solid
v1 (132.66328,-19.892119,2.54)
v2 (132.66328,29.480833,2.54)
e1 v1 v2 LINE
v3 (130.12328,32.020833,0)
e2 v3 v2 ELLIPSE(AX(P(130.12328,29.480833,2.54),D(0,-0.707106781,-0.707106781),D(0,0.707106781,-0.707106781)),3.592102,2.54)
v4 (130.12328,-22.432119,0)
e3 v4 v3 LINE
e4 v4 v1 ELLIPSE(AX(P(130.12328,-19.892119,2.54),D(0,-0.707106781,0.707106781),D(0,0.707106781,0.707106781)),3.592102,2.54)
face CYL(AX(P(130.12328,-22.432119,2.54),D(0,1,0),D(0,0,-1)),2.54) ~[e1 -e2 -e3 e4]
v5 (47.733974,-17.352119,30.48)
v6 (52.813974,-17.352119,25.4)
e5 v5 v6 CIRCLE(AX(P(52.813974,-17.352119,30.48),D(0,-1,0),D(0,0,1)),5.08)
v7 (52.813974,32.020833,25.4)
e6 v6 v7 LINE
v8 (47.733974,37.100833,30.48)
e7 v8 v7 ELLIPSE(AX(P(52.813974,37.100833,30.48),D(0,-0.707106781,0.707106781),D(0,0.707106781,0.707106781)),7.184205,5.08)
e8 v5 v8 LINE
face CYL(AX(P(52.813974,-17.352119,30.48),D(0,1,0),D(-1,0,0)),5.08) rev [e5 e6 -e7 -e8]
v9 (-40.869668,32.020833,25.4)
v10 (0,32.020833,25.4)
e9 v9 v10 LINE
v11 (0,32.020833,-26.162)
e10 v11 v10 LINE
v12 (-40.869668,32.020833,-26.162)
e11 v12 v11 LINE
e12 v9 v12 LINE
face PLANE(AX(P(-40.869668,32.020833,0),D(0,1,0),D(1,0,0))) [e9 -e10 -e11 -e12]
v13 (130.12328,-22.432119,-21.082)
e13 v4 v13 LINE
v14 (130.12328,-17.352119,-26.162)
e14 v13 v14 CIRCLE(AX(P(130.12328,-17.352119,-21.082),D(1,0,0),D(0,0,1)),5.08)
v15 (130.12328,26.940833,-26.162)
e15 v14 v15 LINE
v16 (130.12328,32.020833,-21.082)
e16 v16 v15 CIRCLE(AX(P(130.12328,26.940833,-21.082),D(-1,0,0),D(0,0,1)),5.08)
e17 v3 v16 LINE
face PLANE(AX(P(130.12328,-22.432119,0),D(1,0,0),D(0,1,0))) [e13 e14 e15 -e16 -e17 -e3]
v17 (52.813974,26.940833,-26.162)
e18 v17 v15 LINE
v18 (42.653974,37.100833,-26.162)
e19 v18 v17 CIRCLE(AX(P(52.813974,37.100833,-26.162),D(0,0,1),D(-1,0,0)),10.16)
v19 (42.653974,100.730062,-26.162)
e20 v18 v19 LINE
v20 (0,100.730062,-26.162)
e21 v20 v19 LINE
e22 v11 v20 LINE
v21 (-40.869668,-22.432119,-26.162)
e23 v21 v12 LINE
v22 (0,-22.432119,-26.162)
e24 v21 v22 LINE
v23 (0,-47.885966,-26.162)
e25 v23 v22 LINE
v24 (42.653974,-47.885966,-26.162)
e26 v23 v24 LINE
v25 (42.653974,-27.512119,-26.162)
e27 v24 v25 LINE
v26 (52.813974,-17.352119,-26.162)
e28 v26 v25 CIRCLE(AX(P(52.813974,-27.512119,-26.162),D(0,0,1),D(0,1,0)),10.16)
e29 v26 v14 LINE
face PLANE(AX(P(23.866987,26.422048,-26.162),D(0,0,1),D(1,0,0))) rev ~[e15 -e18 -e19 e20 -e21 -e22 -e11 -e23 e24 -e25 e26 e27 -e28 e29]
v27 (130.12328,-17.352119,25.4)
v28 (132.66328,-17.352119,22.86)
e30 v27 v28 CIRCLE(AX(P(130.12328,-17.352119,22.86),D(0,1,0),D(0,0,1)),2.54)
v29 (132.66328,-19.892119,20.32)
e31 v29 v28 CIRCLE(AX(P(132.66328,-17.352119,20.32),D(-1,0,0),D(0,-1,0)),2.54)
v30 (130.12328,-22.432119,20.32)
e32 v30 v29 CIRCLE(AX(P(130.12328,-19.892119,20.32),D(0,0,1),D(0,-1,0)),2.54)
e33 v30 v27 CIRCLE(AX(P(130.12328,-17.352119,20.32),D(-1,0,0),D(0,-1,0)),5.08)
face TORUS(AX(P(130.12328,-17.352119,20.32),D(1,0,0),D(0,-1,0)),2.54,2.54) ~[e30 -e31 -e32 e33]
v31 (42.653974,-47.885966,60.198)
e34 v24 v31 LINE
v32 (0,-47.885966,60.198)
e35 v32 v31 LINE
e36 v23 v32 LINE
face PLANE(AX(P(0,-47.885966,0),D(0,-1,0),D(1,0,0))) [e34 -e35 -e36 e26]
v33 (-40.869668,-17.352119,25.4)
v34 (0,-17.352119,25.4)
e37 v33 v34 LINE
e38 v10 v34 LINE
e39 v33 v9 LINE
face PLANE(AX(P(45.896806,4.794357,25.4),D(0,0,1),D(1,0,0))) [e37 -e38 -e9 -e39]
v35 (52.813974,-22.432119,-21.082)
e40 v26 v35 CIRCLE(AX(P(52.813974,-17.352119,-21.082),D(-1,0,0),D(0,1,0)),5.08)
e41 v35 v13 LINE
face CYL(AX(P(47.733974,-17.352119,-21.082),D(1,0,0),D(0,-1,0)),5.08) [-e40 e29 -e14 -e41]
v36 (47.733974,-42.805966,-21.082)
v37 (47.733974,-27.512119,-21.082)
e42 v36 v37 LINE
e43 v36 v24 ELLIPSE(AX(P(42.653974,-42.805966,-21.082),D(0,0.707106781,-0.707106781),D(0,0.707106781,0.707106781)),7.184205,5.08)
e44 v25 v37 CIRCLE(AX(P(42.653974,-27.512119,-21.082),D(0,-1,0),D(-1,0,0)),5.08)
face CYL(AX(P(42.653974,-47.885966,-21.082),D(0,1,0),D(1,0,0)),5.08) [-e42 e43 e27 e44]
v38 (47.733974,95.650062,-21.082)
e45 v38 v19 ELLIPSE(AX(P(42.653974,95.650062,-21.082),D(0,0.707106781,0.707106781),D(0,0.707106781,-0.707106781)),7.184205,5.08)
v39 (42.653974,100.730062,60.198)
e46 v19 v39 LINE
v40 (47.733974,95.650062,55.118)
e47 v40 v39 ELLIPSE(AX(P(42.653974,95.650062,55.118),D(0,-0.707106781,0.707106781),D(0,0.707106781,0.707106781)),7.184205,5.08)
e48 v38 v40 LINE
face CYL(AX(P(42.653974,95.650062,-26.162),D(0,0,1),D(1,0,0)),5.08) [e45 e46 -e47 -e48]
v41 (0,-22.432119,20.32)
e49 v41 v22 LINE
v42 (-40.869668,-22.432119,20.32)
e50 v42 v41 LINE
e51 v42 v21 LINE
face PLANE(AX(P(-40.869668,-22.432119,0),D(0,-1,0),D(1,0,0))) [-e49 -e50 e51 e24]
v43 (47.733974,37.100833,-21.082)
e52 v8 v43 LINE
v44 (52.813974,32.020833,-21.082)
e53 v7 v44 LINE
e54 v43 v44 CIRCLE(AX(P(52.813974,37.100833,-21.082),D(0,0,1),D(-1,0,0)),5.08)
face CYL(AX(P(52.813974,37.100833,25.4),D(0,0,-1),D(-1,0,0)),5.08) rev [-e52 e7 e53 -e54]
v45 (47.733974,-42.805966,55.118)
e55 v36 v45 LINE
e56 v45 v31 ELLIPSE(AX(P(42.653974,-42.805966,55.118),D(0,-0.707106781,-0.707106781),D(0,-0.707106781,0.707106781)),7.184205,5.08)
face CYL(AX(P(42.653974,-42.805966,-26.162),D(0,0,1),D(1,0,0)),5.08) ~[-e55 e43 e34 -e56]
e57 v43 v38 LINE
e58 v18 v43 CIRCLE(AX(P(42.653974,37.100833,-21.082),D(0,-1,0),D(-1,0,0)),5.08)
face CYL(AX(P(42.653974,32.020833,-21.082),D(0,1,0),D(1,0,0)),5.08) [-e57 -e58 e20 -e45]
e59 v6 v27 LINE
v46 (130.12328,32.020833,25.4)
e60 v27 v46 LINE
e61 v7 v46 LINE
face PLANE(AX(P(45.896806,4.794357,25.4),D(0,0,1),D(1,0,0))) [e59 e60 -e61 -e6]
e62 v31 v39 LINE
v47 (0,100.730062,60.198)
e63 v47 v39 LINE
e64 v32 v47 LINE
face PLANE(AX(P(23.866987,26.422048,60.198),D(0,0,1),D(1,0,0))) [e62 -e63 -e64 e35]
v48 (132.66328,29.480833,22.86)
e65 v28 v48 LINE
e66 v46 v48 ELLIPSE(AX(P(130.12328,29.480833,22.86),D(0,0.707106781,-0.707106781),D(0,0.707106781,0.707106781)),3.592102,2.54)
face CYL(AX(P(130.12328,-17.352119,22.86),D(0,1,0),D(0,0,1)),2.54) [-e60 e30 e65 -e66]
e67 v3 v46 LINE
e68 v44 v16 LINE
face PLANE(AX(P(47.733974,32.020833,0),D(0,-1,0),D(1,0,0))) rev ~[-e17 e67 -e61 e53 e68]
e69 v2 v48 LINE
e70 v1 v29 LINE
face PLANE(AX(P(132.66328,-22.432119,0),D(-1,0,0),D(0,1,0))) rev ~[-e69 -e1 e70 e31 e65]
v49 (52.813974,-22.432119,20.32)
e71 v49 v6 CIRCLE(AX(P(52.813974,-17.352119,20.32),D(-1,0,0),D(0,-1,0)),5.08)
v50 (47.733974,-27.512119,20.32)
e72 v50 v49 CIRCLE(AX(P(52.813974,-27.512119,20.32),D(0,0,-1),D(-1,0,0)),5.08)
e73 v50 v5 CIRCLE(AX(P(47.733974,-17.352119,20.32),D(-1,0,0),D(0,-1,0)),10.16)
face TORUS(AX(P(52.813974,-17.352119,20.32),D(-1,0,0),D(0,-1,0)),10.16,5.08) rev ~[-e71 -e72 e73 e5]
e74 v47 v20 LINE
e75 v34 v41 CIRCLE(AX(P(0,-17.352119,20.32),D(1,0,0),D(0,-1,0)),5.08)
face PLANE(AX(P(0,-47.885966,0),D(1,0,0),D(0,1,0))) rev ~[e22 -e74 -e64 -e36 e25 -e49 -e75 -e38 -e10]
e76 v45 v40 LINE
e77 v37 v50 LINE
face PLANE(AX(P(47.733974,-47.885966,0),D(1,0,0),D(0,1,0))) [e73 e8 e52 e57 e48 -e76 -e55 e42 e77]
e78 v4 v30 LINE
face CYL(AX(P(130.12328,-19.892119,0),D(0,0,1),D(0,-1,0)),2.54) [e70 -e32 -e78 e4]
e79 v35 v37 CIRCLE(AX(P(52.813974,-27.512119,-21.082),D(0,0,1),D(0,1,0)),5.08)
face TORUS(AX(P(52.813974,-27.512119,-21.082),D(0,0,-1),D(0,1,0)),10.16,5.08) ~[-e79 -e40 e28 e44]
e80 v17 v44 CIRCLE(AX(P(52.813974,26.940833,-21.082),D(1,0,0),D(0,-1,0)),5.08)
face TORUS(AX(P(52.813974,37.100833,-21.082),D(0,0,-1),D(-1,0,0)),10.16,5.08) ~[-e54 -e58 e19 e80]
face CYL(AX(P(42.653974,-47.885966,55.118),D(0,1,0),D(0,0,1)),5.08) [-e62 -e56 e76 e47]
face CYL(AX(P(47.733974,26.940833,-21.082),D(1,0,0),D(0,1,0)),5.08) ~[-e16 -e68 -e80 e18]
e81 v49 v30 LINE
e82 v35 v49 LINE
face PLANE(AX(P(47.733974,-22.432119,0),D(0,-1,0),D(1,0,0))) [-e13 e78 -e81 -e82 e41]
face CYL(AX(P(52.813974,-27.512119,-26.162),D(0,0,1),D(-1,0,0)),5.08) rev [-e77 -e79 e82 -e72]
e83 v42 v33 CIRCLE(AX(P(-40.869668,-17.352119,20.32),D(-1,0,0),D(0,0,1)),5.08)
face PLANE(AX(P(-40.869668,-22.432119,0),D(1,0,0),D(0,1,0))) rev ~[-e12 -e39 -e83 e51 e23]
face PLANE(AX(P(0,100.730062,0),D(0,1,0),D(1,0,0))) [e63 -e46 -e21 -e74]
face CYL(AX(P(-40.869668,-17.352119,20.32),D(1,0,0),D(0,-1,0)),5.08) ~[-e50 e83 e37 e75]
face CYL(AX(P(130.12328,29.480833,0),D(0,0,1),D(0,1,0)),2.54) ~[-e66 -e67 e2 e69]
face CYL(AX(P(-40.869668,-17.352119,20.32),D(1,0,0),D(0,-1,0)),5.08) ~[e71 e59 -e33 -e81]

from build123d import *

# Parameters (mm, degrees)
F0_W     = 173.5329478979
F0_H     = 54.4529519975
F1_DEPTH = 25.4
F2_R     = 5.08
F3_R     = 2.54
F4_W     = 47.7339737117
F4_H     = 148.616027087
F5_DEPTH = 60.198
F6_DEPTH = 26.162
F7_R     = 5.08


with BuildPart() as f1:
    # F0 (on Top) → F1 (new body)
    with BuildSketch(Plane.XY):
        with Locations((45.8968058228, 4.7943573445)):
            Rectangle(F0_W, F0_H)
    extrude(amount=F1_DEPTH)

    # F2
    f2_edges = [f1.edges().sort_by_distance(p)[0] for p in [
        (45.896806, -22.432119, 25.4),
    ]]
    fillet(f2_edges, radius=F2_R)

    # F3
    f3_edges = [f1.edges().sort_by_distance(p)[0] for p in [
        (132.66328, -22.432119, 10.16),
        (132.66328, -20.944221, 23.912102),
        (132.66328, 4.794357, 0),
        (132.66328, 7.334357, 25.4),
        (132.66328, 32.020833, 12.7),
    ]]
    fillet(f3_edges, radius=F3_R)

    # F4 (on Top) → F5 (join)
    with BuildSketch(Plane.XY):
        with Locations((23.8669868559, 26.4220479876)):
            Rectangle(F4_W, F4_H)
    extrude(amount=F5_DEPTH)

    # F6 (add): a face of the model
    f6_faces = [f1.faces().sort_by_distance(p)[0] for p in [
        (37.8680200683, 15.9075868005, 0),
    ]]
    extrude(f6_faces, amount=F6_DEPTH)

    # F7
    f7_edges = [f1.edges().sort_by_distance(p)[0] for p in [
        (47.733974, -47.885966, 17.018),
        (47.733974, -35.159042, -26.162),
        (47.733974, -22.432119, -2.921),
        (47.733974, -20.944221, 23.912102),
        (47.733974, 7.334357, 25.4),
        (47.733974, 32.020833, -0.381),
        (47.733974, 66.375447, -26.162),
        (47.733974, 100.730062, 17.018),
        (47.733974, 26.422048, 60.198),
        (88.928627, -22.432119, -26.162),
        (88.928627, 32.020833, -26.162),
    ]]
    fillet(f7_edges, radius=F7_R)


solid = f1.part
